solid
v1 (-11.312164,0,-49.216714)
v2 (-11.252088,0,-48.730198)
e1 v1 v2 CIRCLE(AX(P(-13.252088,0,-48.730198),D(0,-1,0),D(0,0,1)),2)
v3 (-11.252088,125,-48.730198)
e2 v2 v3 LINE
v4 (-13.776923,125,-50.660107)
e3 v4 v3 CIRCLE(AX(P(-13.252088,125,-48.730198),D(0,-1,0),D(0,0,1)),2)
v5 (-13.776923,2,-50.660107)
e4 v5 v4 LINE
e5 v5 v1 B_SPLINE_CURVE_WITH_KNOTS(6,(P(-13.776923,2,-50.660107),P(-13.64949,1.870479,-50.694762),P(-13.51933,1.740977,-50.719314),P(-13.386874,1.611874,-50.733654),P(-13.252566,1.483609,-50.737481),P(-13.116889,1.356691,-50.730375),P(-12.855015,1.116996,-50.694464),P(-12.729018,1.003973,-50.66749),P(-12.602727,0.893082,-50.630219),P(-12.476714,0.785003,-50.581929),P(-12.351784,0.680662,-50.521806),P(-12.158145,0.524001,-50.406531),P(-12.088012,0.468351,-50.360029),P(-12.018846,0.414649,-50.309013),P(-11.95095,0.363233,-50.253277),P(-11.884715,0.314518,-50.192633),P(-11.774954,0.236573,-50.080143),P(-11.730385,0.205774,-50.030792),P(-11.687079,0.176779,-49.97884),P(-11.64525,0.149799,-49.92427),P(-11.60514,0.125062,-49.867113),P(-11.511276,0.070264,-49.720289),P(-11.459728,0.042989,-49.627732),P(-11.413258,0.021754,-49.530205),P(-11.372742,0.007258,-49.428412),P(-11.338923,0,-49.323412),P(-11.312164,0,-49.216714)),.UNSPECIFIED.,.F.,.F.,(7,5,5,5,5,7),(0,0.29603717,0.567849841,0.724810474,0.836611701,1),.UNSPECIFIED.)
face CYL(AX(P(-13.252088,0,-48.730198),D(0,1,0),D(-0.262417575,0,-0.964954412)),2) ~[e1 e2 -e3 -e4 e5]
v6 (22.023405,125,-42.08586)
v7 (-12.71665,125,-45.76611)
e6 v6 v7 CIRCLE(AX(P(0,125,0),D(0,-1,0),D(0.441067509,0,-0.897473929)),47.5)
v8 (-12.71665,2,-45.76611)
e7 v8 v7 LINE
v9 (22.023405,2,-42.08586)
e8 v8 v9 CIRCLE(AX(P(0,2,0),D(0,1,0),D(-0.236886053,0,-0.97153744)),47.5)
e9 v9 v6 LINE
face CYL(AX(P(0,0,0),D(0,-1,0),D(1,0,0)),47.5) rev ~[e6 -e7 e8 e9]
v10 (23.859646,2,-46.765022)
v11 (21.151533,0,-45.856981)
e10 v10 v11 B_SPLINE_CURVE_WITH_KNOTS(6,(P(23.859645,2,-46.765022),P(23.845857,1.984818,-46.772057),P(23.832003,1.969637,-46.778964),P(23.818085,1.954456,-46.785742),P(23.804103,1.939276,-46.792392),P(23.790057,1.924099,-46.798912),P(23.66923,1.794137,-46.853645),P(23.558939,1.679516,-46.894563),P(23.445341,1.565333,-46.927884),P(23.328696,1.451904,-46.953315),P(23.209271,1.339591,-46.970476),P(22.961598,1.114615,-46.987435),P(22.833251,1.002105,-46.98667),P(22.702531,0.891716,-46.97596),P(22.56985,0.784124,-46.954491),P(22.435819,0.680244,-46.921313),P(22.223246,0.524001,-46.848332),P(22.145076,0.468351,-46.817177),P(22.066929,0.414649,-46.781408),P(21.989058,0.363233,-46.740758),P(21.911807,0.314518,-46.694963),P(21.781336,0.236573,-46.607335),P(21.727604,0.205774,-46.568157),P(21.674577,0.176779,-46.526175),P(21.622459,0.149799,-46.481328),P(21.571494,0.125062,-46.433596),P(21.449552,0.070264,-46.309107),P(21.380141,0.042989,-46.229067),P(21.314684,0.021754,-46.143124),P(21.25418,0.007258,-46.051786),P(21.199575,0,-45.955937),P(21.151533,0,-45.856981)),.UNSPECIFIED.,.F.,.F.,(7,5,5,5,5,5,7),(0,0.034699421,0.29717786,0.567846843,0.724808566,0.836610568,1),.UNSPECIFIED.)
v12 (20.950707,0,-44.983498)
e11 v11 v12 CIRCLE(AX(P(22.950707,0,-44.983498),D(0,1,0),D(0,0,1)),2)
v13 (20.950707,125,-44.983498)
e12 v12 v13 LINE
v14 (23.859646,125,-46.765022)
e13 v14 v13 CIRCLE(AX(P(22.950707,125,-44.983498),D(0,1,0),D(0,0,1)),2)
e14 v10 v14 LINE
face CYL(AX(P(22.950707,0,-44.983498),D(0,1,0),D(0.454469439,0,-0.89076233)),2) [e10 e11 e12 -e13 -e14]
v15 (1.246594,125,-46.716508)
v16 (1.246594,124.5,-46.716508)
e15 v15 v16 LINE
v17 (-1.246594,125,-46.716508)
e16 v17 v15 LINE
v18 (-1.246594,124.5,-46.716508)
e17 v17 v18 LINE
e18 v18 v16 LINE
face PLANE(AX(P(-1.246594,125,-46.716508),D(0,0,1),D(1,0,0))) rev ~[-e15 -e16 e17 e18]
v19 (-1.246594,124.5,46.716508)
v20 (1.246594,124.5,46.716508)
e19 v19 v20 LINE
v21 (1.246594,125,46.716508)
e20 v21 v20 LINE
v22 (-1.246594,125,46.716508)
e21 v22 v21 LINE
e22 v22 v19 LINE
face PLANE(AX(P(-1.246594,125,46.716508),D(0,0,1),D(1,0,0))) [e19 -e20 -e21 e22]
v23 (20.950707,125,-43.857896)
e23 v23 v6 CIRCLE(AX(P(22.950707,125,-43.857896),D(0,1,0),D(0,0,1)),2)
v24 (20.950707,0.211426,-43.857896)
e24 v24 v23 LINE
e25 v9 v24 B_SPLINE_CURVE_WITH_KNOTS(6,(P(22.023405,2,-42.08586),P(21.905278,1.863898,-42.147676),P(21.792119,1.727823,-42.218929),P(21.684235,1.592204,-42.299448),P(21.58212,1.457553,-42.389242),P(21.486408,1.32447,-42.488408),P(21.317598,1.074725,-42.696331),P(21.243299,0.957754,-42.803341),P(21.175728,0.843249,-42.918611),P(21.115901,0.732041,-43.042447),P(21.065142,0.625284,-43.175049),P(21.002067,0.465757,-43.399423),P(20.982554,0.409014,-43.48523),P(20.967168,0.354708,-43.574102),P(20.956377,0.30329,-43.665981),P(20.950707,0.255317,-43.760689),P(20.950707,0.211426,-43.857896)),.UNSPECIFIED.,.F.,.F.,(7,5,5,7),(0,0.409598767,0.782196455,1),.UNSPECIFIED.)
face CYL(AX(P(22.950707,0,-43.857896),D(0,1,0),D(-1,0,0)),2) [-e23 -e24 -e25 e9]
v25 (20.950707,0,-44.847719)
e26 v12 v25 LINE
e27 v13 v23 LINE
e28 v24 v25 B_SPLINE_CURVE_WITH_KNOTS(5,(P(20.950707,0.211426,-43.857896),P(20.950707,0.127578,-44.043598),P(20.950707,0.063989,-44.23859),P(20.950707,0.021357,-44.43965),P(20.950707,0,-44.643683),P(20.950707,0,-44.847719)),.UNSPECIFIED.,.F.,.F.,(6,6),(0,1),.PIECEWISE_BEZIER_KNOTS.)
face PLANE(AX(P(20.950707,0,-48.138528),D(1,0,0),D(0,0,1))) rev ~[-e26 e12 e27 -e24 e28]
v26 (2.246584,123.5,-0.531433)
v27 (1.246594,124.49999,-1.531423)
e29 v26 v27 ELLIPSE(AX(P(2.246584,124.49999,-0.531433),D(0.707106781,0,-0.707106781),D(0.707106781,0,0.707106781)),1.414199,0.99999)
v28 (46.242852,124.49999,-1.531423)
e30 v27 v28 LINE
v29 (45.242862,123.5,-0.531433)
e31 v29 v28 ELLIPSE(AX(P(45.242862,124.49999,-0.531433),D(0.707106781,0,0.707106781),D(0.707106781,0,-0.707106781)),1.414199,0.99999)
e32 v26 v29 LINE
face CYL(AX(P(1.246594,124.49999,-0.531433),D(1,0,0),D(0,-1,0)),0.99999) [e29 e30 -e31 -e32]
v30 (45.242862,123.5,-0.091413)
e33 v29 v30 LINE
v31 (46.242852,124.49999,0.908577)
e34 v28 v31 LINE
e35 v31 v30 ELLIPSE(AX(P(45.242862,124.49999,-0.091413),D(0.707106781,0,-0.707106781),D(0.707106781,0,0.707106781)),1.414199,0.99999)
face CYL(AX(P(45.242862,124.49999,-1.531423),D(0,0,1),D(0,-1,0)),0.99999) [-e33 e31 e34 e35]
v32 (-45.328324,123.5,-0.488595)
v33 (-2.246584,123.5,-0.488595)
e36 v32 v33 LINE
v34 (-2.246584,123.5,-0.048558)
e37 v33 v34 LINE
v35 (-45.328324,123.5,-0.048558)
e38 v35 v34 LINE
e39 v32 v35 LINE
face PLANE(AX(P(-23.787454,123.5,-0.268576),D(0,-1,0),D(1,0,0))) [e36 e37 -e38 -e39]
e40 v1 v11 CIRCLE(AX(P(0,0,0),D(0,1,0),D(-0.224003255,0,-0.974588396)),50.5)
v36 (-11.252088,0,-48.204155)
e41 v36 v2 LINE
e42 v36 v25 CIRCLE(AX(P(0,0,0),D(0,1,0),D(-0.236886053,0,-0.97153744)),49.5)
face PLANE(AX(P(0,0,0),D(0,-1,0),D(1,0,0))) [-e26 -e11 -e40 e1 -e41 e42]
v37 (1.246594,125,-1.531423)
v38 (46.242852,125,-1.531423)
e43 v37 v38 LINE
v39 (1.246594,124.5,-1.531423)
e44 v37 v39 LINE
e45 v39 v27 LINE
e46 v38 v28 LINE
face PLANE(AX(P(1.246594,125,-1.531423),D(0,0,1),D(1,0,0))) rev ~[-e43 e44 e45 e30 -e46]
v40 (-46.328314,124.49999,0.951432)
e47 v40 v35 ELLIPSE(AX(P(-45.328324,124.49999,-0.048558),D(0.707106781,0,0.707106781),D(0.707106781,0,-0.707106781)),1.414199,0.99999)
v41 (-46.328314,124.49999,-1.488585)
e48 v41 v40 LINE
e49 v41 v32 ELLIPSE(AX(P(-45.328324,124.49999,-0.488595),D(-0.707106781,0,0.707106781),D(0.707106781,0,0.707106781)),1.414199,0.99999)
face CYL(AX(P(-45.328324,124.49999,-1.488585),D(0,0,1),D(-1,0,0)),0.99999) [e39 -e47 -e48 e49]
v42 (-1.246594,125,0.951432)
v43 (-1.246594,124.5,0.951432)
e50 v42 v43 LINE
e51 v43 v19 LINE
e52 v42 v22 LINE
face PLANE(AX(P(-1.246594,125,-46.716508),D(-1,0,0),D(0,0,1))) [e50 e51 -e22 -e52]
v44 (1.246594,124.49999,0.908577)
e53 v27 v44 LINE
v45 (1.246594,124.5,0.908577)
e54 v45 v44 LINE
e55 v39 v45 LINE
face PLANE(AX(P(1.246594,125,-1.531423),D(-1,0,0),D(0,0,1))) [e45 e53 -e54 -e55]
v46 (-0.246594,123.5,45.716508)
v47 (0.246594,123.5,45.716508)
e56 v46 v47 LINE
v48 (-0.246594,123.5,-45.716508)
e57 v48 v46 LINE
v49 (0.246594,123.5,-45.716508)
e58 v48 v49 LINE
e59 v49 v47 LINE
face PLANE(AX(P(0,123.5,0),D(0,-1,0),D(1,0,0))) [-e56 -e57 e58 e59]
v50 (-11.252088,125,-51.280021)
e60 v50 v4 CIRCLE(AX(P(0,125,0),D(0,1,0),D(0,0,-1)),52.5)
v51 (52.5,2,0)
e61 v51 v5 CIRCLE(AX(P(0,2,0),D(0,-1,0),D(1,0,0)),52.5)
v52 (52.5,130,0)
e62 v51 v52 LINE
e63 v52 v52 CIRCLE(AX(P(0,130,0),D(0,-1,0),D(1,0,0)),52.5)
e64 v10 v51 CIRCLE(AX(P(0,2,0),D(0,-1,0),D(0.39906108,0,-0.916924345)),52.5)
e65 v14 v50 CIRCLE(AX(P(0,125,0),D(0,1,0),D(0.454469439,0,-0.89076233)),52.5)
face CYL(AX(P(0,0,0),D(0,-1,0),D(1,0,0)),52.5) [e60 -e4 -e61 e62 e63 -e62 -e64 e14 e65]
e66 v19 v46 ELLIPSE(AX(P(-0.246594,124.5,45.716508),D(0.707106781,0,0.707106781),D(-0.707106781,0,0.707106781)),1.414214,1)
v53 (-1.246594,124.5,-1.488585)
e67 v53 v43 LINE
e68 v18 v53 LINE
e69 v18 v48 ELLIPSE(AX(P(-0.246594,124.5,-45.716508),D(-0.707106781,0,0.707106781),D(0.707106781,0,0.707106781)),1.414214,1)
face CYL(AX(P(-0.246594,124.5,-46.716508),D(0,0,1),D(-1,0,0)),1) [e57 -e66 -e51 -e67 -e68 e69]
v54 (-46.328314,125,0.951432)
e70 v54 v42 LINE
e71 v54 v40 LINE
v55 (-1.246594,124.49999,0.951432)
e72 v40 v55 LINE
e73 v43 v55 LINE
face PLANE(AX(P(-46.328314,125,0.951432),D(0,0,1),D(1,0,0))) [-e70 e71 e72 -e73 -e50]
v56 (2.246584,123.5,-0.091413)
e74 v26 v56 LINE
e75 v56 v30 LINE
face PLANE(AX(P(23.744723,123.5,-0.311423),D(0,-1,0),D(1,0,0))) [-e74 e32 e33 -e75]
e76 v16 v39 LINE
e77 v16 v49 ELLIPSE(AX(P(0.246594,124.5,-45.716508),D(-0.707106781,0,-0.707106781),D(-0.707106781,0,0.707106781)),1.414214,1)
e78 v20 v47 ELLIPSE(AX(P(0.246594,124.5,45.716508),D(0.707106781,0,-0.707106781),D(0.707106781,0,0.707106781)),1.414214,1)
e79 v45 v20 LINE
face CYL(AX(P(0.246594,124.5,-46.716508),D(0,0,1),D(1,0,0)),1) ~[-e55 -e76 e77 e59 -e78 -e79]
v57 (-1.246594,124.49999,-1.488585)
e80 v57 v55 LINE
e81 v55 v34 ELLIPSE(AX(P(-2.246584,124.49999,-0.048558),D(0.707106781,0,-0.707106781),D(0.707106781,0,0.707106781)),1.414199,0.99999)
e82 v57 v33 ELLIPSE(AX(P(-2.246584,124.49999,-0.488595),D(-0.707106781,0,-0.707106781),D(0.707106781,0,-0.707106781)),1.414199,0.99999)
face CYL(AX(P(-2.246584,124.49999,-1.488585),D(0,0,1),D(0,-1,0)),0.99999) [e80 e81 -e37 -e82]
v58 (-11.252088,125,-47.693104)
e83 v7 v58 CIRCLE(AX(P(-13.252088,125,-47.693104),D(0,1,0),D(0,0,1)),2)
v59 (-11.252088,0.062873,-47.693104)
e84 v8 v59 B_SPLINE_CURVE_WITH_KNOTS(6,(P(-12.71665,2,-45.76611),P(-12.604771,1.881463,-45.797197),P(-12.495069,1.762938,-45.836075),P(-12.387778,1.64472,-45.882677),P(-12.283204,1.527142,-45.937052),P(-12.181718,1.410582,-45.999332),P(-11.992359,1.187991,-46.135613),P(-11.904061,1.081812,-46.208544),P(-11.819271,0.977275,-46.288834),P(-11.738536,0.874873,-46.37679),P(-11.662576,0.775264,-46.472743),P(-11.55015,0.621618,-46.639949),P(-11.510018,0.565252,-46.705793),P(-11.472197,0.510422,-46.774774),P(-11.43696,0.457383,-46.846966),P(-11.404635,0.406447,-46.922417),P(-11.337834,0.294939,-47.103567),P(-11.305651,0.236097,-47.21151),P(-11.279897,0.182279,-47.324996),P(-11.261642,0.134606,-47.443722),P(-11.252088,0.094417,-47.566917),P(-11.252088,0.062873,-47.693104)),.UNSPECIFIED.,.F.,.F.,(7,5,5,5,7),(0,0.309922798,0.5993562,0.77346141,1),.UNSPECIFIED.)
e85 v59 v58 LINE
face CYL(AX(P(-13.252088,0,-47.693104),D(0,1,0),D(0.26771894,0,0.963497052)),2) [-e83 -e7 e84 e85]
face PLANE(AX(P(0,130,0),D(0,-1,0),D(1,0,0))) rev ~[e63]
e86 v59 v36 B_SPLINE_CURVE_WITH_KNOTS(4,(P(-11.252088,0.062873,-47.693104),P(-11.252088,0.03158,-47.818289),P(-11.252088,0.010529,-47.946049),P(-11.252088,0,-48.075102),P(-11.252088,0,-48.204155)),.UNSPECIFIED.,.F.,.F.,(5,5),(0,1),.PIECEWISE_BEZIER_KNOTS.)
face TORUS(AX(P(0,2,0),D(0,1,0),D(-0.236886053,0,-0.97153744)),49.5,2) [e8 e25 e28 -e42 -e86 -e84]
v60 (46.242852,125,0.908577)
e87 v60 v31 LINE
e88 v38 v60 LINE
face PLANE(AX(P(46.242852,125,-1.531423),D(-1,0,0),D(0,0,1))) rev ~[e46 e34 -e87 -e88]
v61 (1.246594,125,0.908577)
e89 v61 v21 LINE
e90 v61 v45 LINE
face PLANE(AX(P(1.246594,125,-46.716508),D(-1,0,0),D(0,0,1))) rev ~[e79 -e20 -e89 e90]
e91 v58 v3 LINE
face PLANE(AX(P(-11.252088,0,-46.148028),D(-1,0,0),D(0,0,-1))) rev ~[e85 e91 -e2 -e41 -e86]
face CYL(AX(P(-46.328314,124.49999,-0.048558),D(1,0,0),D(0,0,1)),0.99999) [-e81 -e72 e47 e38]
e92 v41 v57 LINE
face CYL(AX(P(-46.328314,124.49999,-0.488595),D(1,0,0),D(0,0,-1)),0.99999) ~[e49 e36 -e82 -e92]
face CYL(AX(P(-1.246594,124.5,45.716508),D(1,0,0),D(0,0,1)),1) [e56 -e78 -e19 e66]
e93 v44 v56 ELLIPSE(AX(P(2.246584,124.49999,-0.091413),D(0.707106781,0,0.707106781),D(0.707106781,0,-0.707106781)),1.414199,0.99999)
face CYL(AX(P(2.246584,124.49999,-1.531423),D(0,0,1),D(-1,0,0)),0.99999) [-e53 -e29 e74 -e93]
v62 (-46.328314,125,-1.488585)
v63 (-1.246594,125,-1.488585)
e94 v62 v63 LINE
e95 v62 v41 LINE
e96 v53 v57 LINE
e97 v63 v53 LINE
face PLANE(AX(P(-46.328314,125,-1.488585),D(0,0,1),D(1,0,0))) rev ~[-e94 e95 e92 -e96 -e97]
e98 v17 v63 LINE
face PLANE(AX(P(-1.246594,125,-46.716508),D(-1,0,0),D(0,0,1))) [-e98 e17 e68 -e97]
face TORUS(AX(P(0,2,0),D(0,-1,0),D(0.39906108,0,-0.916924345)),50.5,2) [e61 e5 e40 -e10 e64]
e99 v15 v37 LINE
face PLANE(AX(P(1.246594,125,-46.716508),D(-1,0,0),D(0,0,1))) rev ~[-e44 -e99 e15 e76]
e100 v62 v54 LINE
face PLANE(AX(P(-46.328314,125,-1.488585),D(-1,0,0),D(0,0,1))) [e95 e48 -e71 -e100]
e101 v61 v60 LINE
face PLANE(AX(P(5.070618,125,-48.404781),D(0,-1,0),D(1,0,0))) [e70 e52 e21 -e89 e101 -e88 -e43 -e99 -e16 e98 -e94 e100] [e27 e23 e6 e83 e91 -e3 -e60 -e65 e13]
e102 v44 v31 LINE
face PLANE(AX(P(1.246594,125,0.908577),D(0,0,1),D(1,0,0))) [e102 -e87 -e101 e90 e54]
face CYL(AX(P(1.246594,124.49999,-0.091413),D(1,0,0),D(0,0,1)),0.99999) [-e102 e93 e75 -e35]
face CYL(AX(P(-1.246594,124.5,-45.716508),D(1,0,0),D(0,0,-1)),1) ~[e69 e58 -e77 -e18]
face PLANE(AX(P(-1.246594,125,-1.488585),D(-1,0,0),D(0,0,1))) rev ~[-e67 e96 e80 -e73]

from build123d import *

# Parameters (mm, degrees)
F0_R      = 52.5
F1_DEPTH  = 130
F2_R      = 47.5
F3_DEPTH  = 125
F5_DEPTH  = 125
F6_R      = 2
F7_W      = 2.493188018
F7_H      = 93.4330150485
F8_DEPTH  = 1.5
F9_R      = 1
F10_W     = 45.0817196397
F10_H     = 2.4400168913
F11_DEPTH = 1.5
F12_R     = 0.99999
F13_W     = 44.996257755
F13_H     = 2.44
F14_DEPTH = 1.5
F15_R     = 0.99999


# Not quite as in the source:
# - a fillet or chamfer is up to 0.001 mm smaller than in the source, because OpenCascade refuses the exact size


with BuildPart() as f1:
    # F0 (on Front) → F1 (new body)
    with BuildSketch(Plane.XZ):
        Circle(F0_R)
    extrude(amount=-F1_DEPTH)

    # F2 (on face) → F3 (cut)
    with BuildSketch(Plane.XZ):
        Circle(F2_R)
    extrude(amount=-F3_DEPTH, mode=Mode.SUBTRACT)

    # F4 (on face) → F5 (cut)
    with BuildSketch(Plane.XZ):
        with BuildLine():
            ThreePointArc((20.9507066756, -42.6300116091), (5.1584797983, -47.2190648591), (-11.2520875409, -46.1480284083))
            Line((-11.2520875409, -46.1480284083), (-11.2520875409, -51.280020729))
            ThreePointArc((-11.2520875409, -51.280020729), (5.0973568866, -52.2519564492), (20.9507066756, -48.1385281224))
            Line((20.9507066756, -48.1385281224), (20.9507066756, -42.6300116091))
        make_face()
    extrude(amount=-F5_DEPTH, mode=Mode.SUBTRACT)

    # F6
    f6_edges = [f1.edges().sort_by_distance(p)[0] for p in [
        (-32.905284, 0, 40.90834),
        (-5.15848, 0, 47.219065),
        (-11.252088, 62.5, -46.148028),
        (20.950707, 62.5, -42.630012),
        (-11.252088, 62.5, -51.280021),
        (20.950707, 62.5, -48.138528),
    ]]
    fillet(f6_edges, radius=F6_R)

    # F7 (on face) → F8 (join)
    with BuildSketch(Plane.XZ.offset(-125)):
        Rectangle(F7_W, F7_H)
    extrude(amount=F8_DEPTH)

    # F9
    f9_edges = [f1.edges().sort_by_distance(p)[0] for p in [
        (-1.246594, 123.5, 0),
        (1.246594, 123.5, 0),
        (0, 123.5, 46.716508),
        (0, 123.5, -46.716508),
    ]]
    fillet(f9_edges, radius=F9_R)

    # F10 (on face) → F11 (join)
    with BuildSketch(Plane.XZ.offset(-125)):
        with Locations((-23.7874538288, -0.268576463)):
            Rectangle(F10_W, F10_H)
    extrude(amount=F11_DEPTH)

    # F12 (radius 1 in the source; OpenCascade refuses exactly that, so slightly less here)
    f12_edges = [f1.edges().sort_by_distance(p)[0] for p in [
        (-23.787454, 123.5, -1.488585),
        (-23.787454, 123.5, 0.951432),
        (-46.328314, 123.5, -0.268576),
        (-1.246594, 123.5, -0.268576),
    ]]
    fillet(f12_edges, radius=F12_R)

    # F13 (on face) → F14 (join)
    with BuildSketch(Plane.XZ.offset(-125)):
        with Locations((23.7447228865, -0.311423186)):
            Rectangle(F13_W, F13_H)
    extrude(amount=F14_DEPTH)

    # F15 (radius 1 in the source; OpenCascade refuses exactly that, so slightly less here)
    f15_edges = [f1.edges().sort_by_distance(p)[0] for p in [
        (23.744723, 123.5, 0.908577),
        (23.744723, 123.5, -1.531423),
        (1.246594, 123.5, -0.311423),
        (46.242852, 123.5, -0.311423),
    ]]
    fillet(f15_edges, radius=F15_R)


solid = f1.part
